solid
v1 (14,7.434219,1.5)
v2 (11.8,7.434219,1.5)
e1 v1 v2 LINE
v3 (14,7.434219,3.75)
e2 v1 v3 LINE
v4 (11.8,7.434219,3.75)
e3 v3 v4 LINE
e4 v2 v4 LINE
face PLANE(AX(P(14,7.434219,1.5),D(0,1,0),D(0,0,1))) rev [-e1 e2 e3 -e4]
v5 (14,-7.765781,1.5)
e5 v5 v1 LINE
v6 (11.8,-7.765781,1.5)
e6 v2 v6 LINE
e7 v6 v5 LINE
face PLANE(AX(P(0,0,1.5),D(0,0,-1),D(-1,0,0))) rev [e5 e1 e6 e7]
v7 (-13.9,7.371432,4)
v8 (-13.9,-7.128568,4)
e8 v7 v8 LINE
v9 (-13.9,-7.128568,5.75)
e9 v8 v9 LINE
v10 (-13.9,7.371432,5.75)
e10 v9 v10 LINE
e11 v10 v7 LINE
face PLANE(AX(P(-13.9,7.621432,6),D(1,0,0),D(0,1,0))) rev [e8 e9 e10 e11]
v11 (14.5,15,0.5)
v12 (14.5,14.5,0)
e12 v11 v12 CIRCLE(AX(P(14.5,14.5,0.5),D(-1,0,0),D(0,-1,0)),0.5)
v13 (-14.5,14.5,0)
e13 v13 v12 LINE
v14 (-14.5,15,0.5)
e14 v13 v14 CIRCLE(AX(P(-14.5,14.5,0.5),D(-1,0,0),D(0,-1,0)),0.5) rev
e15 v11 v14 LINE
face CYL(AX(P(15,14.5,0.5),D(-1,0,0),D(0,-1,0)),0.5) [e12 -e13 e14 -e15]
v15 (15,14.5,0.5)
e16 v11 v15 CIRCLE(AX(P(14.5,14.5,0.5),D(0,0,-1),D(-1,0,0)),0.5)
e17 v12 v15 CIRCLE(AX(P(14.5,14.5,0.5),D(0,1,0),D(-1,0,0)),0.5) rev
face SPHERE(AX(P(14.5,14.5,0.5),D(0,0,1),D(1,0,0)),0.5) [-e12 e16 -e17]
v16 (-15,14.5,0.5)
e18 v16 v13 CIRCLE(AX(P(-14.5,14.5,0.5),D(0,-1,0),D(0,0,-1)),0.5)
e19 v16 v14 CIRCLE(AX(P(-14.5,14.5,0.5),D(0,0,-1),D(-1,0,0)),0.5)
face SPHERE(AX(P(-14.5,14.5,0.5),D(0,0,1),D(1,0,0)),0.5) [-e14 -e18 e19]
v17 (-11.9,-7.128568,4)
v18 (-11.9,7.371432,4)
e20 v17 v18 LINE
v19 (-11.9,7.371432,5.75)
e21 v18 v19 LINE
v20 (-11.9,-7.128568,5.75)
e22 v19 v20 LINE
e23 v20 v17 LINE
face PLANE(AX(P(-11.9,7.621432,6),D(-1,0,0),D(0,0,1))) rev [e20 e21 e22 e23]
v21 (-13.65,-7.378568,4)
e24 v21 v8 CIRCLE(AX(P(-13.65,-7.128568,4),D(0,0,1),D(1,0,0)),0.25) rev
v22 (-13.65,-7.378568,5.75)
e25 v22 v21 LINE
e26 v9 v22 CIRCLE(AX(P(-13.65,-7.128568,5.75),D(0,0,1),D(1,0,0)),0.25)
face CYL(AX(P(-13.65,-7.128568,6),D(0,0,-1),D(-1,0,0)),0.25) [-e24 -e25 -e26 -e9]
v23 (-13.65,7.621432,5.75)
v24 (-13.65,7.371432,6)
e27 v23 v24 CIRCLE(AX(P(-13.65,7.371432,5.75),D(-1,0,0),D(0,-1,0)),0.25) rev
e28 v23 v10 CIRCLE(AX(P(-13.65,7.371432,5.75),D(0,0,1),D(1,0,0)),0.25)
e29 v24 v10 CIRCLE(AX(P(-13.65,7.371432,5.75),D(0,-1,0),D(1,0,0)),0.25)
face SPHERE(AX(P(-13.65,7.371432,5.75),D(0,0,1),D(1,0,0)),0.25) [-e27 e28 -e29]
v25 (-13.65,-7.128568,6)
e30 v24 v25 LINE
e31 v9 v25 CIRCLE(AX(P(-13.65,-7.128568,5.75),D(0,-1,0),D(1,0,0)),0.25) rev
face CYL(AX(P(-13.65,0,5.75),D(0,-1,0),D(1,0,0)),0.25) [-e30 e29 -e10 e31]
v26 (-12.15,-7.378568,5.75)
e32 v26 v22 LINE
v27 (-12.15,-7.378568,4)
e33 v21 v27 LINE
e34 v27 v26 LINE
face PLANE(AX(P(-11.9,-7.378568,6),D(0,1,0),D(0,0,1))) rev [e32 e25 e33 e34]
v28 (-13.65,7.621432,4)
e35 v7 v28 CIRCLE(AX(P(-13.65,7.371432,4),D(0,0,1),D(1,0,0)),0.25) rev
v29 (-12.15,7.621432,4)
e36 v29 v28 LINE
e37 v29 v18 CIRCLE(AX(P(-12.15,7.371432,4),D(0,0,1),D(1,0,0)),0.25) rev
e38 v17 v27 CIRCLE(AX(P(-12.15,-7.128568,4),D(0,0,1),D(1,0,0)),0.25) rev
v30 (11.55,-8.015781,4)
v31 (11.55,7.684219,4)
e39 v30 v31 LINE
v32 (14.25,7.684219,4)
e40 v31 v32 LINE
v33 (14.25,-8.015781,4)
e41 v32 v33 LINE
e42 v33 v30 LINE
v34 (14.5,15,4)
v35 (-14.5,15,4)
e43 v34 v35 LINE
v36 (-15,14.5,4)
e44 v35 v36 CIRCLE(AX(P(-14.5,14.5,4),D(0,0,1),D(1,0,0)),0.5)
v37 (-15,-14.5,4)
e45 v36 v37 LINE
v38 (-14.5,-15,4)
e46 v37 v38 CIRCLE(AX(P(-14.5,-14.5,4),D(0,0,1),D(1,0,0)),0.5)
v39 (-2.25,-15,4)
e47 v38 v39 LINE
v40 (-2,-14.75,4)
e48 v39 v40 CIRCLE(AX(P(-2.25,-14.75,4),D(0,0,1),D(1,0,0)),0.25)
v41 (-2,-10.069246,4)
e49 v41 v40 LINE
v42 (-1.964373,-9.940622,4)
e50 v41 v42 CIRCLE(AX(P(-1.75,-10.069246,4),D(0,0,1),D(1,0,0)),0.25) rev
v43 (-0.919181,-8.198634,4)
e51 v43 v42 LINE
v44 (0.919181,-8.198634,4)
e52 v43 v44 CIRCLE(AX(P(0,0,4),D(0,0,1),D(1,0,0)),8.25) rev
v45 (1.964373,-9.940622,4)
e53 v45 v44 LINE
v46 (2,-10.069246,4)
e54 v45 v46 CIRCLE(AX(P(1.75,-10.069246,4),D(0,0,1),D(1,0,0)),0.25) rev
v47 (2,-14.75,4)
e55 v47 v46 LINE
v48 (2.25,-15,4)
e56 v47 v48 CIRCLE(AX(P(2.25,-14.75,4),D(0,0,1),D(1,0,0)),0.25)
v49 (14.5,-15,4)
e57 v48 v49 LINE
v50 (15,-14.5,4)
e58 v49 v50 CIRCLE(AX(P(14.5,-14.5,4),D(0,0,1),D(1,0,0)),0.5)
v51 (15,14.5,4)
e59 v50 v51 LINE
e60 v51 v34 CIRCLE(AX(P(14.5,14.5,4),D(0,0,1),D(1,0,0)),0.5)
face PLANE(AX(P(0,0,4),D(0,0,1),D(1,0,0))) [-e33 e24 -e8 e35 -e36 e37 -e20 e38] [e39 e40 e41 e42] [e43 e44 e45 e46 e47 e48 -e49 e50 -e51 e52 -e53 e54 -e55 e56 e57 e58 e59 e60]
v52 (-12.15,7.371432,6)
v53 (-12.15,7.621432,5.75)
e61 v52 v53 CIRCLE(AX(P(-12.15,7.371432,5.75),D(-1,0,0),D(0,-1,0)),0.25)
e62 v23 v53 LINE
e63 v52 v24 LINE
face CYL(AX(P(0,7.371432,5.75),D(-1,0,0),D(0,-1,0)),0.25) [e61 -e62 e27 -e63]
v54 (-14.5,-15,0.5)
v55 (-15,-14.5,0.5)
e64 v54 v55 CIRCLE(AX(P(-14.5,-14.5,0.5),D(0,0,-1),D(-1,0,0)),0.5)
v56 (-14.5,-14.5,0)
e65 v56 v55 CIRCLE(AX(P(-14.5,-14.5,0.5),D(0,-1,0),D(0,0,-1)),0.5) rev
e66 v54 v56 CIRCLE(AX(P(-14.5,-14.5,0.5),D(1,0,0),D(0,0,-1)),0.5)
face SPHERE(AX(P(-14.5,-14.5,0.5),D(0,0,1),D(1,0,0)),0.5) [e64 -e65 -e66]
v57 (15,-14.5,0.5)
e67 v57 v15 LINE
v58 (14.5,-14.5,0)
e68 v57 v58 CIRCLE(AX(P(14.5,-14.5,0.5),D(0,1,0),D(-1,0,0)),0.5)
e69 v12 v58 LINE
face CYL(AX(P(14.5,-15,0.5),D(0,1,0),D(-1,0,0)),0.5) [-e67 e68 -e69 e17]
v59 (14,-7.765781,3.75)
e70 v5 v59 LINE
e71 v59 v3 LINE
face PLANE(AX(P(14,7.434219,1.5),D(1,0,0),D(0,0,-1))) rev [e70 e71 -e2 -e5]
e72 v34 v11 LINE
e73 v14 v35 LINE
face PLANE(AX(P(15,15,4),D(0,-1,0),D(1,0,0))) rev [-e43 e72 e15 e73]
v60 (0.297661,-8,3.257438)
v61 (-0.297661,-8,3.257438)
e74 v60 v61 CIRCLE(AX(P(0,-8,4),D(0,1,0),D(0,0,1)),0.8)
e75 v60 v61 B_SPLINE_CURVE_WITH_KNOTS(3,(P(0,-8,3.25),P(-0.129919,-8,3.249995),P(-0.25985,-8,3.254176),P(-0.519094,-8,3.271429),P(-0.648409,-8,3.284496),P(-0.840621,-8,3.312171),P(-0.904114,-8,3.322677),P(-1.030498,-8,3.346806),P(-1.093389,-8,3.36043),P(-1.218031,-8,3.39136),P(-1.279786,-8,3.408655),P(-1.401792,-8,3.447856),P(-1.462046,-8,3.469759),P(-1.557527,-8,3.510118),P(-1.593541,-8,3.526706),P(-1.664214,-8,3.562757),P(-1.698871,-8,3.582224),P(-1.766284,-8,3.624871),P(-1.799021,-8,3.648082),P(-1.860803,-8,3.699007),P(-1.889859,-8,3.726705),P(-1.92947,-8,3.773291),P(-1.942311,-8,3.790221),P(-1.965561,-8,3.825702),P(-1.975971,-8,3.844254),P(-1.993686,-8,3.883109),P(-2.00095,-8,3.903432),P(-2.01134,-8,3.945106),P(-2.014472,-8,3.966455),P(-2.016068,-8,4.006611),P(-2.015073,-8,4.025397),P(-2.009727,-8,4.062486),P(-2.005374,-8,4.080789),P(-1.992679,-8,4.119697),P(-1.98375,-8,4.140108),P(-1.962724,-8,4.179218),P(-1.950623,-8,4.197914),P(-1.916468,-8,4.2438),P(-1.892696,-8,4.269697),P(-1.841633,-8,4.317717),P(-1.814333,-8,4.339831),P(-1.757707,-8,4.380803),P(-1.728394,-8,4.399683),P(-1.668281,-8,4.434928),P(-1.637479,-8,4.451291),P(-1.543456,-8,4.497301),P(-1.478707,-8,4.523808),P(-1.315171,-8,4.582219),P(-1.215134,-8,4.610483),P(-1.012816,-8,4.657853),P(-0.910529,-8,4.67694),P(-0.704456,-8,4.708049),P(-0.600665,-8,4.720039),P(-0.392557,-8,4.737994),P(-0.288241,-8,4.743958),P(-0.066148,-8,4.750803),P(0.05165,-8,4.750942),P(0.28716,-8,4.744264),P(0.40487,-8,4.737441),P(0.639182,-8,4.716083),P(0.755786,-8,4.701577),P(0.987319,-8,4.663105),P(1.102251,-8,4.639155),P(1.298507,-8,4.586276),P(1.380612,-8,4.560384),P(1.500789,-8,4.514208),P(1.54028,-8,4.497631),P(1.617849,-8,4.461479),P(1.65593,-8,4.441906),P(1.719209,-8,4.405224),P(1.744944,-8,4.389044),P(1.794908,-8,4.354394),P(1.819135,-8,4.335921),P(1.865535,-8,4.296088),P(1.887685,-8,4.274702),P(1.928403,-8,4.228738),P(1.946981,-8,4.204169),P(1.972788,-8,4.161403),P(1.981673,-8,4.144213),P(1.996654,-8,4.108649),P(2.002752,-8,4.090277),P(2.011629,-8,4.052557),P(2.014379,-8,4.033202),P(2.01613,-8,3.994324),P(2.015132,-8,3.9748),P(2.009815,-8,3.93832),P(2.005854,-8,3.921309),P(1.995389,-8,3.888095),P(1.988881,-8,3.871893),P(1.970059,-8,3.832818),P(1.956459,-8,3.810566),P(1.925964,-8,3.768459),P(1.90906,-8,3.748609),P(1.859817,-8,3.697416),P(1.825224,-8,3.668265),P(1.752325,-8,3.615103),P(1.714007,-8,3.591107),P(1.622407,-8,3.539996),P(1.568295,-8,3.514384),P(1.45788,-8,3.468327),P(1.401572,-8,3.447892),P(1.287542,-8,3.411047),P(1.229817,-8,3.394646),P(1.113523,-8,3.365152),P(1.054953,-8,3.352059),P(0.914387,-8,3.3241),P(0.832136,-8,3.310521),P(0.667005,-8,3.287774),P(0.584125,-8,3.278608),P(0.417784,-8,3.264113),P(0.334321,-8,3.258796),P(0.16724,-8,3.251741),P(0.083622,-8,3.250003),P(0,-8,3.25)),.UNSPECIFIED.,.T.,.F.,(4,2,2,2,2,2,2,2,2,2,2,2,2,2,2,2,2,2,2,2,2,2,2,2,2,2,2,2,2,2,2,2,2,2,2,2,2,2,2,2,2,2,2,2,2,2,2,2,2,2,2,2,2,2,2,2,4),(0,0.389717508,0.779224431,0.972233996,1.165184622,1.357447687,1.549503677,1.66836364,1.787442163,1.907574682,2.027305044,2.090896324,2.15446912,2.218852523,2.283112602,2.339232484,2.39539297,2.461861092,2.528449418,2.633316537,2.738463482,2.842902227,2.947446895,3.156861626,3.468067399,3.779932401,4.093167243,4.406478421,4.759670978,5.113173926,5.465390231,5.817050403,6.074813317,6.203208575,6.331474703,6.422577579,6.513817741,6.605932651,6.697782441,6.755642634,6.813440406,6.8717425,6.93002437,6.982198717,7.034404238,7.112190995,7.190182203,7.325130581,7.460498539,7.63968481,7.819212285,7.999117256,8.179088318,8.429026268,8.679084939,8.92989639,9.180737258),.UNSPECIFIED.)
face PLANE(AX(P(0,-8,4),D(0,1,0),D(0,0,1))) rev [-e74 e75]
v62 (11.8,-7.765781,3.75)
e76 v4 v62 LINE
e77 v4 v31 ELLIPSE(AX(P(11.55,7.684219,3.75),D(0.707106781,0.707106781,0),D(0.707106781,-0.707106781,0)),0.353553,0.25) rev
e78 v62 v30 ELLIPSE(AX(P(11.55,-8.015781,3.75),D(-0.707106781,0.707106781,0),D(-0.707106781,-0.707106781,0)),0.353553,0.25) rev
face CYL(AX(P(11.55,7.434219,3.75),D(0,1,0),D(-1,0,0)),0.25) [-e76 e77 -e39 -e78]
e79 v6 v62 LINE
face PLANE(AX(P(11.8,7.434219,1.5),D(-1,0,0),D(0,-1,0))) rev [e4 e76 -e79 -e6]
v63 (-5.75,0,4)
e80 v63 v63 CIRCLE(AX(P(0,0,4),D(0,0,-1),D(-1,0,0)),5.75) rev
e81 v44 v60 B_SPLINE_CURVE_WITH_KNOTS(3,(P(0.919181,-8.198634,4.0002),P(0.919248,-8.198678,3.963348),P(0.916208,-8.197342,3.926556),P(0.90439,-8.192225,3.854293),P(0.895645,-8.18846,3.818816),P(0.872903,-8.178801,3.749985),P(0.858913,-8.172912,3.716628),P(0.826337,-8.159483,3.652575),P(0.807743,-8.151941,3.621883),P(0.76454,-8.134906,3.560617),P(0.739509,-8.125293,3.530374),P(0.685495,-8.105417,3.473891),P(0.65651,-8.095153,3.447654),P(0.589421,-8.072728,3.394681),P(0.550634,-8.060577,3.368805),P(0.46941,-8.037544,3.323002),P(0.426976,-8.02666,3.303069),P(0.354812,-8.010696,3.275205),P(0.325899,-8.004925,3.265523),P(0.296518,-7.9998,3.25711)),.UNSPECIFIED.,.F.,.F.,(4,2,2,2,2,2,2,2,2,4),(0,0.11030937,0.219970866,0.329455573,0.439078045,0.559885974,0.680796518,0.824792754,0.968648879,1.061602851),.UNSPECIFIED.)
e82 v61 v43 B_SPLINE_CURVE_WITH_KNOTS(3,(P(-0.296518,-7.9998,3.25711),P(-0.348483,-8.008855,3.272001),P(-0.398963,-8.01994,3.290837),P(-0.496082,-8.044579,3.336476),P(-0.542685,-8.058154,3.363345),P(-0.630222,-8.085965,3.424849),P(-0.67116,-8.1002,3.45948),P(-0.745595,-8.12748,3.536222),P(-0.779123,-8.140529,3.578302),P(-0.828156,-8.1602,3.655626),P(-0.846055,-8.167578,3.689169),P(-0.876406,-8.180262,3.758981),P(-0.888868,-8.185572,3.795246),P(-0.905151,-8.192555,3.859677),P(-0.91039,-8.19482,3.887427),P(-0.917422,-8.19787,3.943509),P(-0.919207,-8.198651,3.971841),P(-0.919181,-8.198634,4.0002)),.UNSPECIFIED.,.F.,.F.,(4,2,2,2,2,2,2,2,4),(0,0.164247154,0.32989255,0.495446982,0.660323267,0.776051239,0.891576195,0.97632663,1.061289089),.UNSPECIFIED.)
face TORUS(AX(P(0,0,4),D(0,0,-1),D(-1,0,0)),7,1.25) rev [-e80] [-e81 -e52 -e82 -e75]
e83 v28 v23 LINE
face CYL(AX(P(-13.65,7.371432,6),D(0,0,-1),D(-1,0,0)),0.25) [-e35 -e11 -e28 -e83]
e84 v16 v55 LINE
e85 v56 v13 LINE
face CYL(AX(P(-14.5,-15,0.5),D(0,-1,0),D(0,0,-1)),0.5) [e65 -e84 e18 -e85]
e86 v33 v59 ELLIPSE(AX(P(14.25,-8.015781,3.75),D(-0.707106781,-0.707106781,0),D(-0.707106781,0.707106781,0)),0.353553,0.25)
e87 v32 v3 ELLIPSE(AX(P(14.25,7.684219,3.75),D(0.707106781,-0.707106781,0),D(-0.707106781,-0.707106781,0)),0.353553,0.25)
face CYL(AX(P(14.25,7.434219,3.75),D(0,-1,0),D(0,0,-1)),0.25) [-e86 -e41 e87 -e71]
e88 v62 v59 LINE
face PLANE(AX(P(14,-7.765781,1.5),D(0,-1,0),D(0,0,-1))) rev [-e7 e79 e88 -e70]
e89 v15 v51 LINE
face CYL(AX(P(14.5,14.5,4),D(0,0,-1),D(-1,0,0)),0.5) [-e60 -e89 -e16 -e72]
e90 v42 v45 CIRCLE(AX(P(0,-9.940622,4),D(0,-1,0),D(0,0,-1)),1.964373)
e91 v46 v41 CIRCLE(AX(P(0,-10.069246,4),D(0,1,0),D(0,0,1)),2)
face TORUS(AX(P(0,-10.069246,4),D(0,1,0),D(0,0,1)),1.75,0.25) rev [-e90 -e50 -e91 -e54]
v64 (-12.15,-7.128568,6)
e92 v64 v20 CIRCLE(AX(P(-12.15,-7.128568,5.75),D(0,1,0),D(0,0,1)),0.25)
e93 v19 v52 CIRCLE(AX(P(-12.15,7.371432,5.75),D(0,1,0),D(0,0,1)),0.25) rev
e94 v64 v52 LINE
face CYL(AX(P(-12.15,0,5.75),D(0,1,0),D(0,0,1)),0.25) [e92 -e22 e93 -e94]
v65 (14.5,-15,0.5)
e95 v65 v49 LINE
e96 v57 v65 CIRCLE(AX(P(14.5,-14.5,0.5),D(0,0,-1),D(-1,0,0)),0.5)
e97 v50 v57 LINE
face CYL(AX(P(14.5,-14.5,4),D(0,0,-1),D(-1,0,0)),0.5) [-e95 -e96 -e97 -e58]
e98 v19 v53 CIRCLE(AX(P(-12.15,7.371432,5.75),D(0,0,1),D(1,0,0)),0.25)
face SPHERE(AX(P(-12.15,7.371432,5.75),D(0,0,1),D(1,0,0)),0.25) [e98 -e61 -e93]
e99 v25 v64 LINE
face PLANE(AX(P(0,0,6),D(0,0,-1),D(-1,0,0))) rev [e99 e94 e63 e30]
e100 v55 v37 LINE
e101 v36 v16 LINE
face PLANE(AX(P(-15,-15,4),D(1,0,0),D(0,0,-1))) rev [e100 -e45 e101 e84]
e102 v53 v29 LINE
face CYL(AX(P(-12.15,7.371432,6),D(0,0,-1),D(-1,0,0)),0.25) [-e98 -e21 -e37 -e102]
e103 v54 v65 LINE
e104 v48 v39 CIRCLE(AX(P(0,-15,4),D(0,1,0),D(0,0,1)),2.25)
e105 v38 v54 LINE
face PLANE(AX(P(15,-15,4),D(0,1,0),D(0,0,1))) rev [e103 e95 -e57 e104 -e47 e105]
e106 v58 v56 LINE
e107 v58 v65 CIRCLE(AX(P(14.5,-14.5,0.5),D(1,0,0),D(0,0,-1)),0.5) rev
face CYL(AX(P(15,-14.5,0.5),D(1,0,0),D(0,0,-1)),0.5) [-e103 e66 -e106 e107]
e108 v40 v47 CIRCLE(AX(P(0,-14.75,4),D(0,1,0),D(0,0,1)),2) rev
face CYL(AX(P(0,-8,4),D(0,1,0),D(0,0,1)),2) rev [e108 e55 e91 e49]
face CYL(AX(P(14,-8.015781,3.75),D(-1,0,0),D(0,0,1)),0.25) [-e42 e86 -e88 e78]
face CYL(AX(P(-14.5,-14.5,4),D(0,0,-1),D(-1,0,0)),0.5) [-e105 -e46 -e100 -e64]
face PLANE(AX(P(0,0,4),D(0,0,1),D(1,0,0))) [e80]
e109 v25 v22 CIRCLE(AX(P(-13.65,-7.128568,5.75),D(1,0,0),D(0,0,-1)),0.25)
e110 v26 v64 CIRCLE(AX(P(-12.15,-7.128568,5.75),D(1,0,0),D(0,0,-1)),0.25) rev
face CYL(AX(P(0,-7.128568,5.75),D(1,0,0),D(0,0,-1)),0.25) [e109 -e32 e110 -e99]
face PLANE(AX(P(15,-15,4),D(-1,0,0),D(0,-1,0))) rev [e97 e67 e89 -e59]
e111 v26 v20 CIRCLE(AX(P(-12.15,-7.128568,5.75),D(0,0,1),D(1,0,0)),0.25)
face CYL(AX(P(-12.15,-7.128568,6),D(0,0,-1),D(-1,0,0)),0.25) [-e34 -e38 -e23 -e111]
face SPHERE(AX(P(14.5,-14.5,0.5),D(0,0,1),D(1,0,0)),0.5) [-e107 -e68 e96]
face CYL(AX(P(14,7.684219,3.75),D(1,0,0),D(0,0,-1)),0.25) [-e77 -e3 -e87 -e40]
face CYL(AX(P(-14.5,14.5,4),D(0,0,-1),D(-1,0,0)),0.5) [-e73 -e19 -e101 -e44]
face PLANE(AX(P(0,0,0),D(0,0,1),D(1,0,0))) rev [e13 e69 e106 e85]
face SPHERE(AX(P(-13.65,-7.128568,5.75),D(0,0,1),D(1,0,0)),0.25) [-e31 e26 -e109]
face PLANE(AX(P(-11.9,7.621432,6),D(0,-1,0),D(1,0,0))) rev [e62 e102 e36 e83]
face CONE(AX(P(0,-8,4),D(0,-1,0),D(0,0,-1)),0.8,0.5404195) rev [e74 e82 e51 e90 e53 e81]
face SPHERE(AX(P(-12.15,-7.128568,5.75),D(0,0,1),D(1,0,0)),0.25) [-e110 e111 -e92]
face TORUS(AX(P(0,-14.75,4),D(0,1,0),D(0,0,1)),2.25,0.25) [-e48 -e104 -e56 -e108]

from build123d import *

# Parameters (mm, degrees)
SKETCH1_W           = 30
SKETCH1_H           = 30
BOSS_EXTRUDE1_DEPTH = 4
SKETCH4_R           = 1.25
SKETCH7_W           = 2
SKETCH7_H           = 15
BOSS_EXTRUDE2_DEPTH = 2
SKETCH8_W           = 2.2
SKETCH8_H           = 15.2
CUT_EXTRUDE2_DEPTH  = 2.5
FILLET1_R           = 0.25
FILLET2_R           = 0.25
FILLET3_R           = 0.25
FILLET5_R           = 0.5
FILLET6_R           = 0.5
FILLET7_R           = 0.25


with BuildPart() as part:
    # Sketch1 → Boss-Extrude1 (new body)
    with BuildSketch(Plane.XY):
        Rectangle(SKETCH1_W, SKETCH1_H)
    extrude(amount=BOSS_EXTRUDE1_DEPTH)

    # Sketch4 → Cut-Revolve1 (revolve, cut)
    with BuildSketch(Plane(origin=(0, 0, 0), x_dir=(1, 0, 0), z_dir=(0, 1, 0)), mode=Mode.PRIVATE) as cut_revolve1_sk:
        with Locations((7, -4)):
            Circle(SKETCH4_R)
    revolve(cut_revolve1_sk.sketch.rotate(Axis((0, 0, 0), (0, 0, 1)), 180), axis=Axis((0, 0, 0), (0, 0, 1)), mode=Mode.SUBTRACT)

    # Sketch9 → Cut-Revolve2 (revolve, cut)
    with BuildSketch(Plane(origin=(0, 0, 0), x_dir=(0, 0, -1), z_dir=(1, 0, 0))):
        Polygon((-4, -8), (-4.8, -8), (-6, -10), (-6, -15), (-4, -15), align=None)
    revolve(axis=Axis((0, -8, 4), (0, -1, 0)), mode=Mode.SUBTRACT)

    # Sketch7 → Boss-Extrude2 (add)
    with BuildSketch(Plane.XY.offset(4)):
        with Locations((-12.9, 0.121431972)):
            Rectangle(SKETCH7_W, SKETCH7_H)
    extrude(amount=BOSS_EXTRUDE2_DEPTH)

    # Sketch8 → Cut-Extrude2 (cut)
    with BuildSketch(Plane.XY.offset(4)):
        with Locations((12.9, -0.165781366)):
            Rectangle(SKETCH8_W, SKETCH8_H)
    extrude(amount=-CUT_EXTRUDE2_DEPTH, mode=Mode.SUBTRACT)

    # Fillet1
    fillet1_edges = [part.edges().sort_by_distance(p)[0] for p in [
        (-13.9, 0.121431972, 6),
        (-12.9, -7.378568028, 6),
        (-11.9, 0.121431972, 6),
        (-12.9, 7.621431972, 6),
    ]]
    fillet(fillet1_edges, radius=FILLET1_R)

    # Fillet2
    # the kernel refuses this fillet: 0.25 mm, written as the material it takes off along each edge
    with BuildSketch(Plane(origin=(-12.15, -7.128568028, 5.75), x_dir=(0, -1, 0), z_dir=(1, 0, 0))) as fillet2_piece_1_section:
        Polygon((0, 0), (FILLET2_R, 0), (FILLET2_R, -FILLET2_R), (0, -FILLET2_R), align=None)
    fillet2_piece_1 = extrude(amount=FILLET2_R, mode=Mode.PRIVATE)
    fillet2_piece_1 = fillet2_piece_1 - Plane(origin=(-12.15, -7.128568028, 5.75), x_dir=(0, 0.7071067811865475, -0.7071067811865475), z_dir=(1, 0, 0)) * Sphere(FILLET2_R, mode=Mode.PRIVATE)
    add(fillet2_piece_1, mode=Mode.SUBTRACT)
    with BuildSketch(Plane(origin=(-13.65, -7.128568028, 5.75), x_dir=(-1, 0, 0), z_dir=(0, -1, 0))) as fillet2_piece_2_section:
        Polygon((0, 0), (FILLET2_R, 0), (FILLET2_R, -FILLET2_R), (0, -FILLET2_R), align=None)
    fillet2_piece_2 = extrude(amount=FILLET2_R, mode=Mode.PRIVATE)
    fillet2_piece_2 = fillet2_piece_2 - Plane(origin=(-13.65, -7.128568028, 5.75), x_dir=(0.7071067811865475, 0, -0.7071067811865475), z_dir=(0, -1, 0)) * Sphere(FILLET2_R, mode=Mode.PRIVATE)
    add(fillet2_piece_2, mode=Mode.SUBTRACT)
    with BuildSketch(Plane(origin=(-12.15, 7.371431972, 5.75), x_dir=(0, 1, 0), z_dir=(1, 0, 0))) as fillet2_piece_3_section:
        Polygon((0, 0), (FILLET2_R, 0), (FILLET2_R, FILLET2_R), (0, FILLET2_R), align=None)
    fillet2_piece_3 = extrude(amount=FILLET2_R, mode=Mode.PRIVATE)
    fillet2_piece_3 = fillet2_piece_3 - Plane(origin=(-12.15, 7.371431972, 5.75), x_dir=(0, -0.7071067811865475, -0.7071067811865475), z_dir=(1, 0, 0)) * Sphere(FILLET2_R, mode=Mode.PRIVATE)
    add(fillet2_piece_3, mode=Mode.SUBTRACT)
    with BuildSketch(Plane(origin=(-13.65, 7.371431972, 5.75), x_dir=(-1, 0, 0), z_dir=(0, 1, 0))) as fillet2_piece_4_section:
        Polygon((0, 0), (FILLET2_R, 0), (FILLET2_R, FILLET2_R), (0, FILLET2_R), align=None)
    fillet2_piece_4 = extrude(amount=FILLET2_R, mode=Mode.PRIVATE)
    fillet2_piece_4 = fillet2_piece_4 - Plane(origin=(-13.65, 7.371431972, 5.75), x_dir=(0.7071067811865475, 0, -0.7071067811865475), z_dir=(0, 1, 0)) * Sphere(FILLET2_R, mode=Mode.PRIVATE)
    add(fillet2_piece_4, mode=Mode.SUBTRACT)
    with BuildSketch(Plane(origin=(-13.9, 7.621431972, 4), x_dir=(1, 0, 0), z_dir=(0, 0, 1)), Plane(origin=(-11.9, 7.621431972, 4), x_dir=(0, -1, 0), z_dir=(0, 0, 1))) as fillet2_piece_5:
        with BuildLine():
            CenterArc((FILLET2_R, -FILLET2_R), FILLET2_R, 90, 90)
            Line((0, -FILLET2_R), (0, 0))
            Line((0, 0), (FILLET2_R, 0))
        make_face()
    extrude(amount=1.75, mode=Mode.SUBTRACT)
    with BuildSketch(Plane(origin=(-11.9, -7.378568028, 4), x_dir=(0, 1, 0), z_dir=(0, 0, 1)), Plane(origin=(-13.9, -7.378568028, 4), x_dir=(1, 0, 0), z_dir=(0, 0, 1))) as fillet2_piece_6:
        with BuildLine():
            CenterArc((FILLET2_R, FILLET2_R), FILLET2_R, 180, 90)
            Line((0, FILLET2_R), (0, 0))
            Line((0, 0), (FILLET2_R, 0))
        make_face()
    extrude(amount=1.75, mode=Mode.SUBTRACT)

    # Fillet3
    fillet3_edges = [part.edges().sort_by_distance(p)[0] for p in [
        (11.8, -0.165781366, 4),
        (12.9, -7.765781366, 4),
        (14, -0.165781366, 4),
        (12.9, 7.434218634, 4),
    ]]
    fillet(fillet3_edges, radius=FILLET3_R)

    # Fillet5
    fillet5_edges = [part.edges().sort_by_distance(p)[0] for p in [
        (0, 15, 0),
        (15, 0, 0),
        (0, -15, 0),
        (-15, 0, 0),
    ]]
    fillet(fillet5_edges, radius=FILLET5_R)

    # Fillet6
    # the kernel refuses this fillet: 0.5 mm, written as the material it takes off along each edge
    with BuildSketch(Plane(origin=(-14.5, 14.5, 0.5), x_dir=(-1, 0, 0), z_dir=(0, 1, 0))) as fillet6_piece_1_section:
        Polygon((0, 0), (FILLET6_R, 0), (FILLET6_R, -FILLET6_R), (0, -FILLET6_R), align=None)
    fillet6_piece_1 = extrude(amount=FILLET6_R, mode=Mode.PRIVATE)
    fillet6_piece_1 = fillet6_piece_1 - Plane(origin=(-14.5, 14.5, 0.5), x_dir=(0.7071067811865475, 0, 0.7071067811865475), z_dir=(0, 1, 0)) * Sphere(FILLET6_R, mode=Mode.PRIVATE)
    add(fillet6_piece_1, mode=Mode.SUBTRACT)
    with BuildSketch(Plane(origin=(14.5, 14.5, 0.5), x_dir=(0, 1, 0), z_dir=(1, 0, 0))) as fillet6_piece_2_section:
        Polygon((0, 0), (FILLET6_R, 0), (FILLET6_R, -FILLET6_R), (0, -FILLET6_R), align=None)
    fillet6_piece_2 = extrude(amount=FILLET6_R, mode=Mode.PRIVATE)
    fillet6_piece_2 = fillet6_piece_2 - Plane(origin=(14.5, 14.5, 0.5), x_dir=(0, -0.7071067811865475, 0.7071067811865475), z_dir=(1, 0, 0)) * Sphere(FILLET6_R, mode=Mode.PRIVATE)
    add(fillet6_piece_2, mode=Mode.SUBTRACT)
    with BuildSketch(Plane(origin=(-14.5, -14.5, 0.5), x_dir=(-1, 0, 0), z_dir=(0, -1, 0))) as fillet6_piece_3_section:
        Polygon((0, 0), (FILLET6_R, 0), (FILLET6_R, FILLET6_R), (0, FILLET6_R), align=None)
    fillet6_piece_3 = extrude(amount=FILLET6_R, mode=Mode.PRIVATE)
    fillet6_piece_3 = fillet6_piece_3 - Plane(origin=(-14.5, -14.5, 0.5), x_dir=(0.7071067811865475, 0, 0.7071067811865475), z_dir=(0, -1, 0)) * Sphere(FILLET6_R, mode=Mode.PRIVATE)
    add(fillet6_piece_3, mode=Mode.SUBTRACT)
    with BuildSketch(Plane(origin=(14.5, -14.5, 0.5), x_dir=(0, -1, 0), z_dir=(1, 0, 0))) as fillet6_piece_4_section:
        Polygon((0, 0), (FILLET6_R, 0), (FILLET6_R, FILLET6_R), (0, FILLET6_R), align=None)
    fillet6_piece_4 = extrude(amount=FILLET6_R, mode=Mode.PRIVATE)
    fillet6_piece_4 = fillet6_piece_4 - Plane(origin=(14.5, -14.5, 0.5), x_dir=(0, 0.7071067811865475, 0.7071067811865475), z_dir=(1, 0, 0)) * Sphere(FILLET6_R, mode=Mode.PRIVATE)
    add(fillet6_piece_4, mode=Mode.SUBTRACT)
    with BuildSketch(Plane(origin=(-15, 15, 0.5), x_dir=(1, 0, 0), z_dir=(0, 0, 1)), Plane(origin=(15, 15, 0.5), x_dir=(0, -1, 0), z_dir=(0, 0, 1))) as fillet6_piece_5:
        with BuildLine():
            CenterArc((FILLET6_R, -FILLET6_R), FILLET6_R, 90, 90)
            Line((0, -FILLET6_R), (0, 0))
            Line((0, 0), (FILLET6_R, 0))
        make_face()
    extrude(amount=4.75, mode=Mode.SUBTRACT)
    with BuildSketch(Plane(origin=(15, -15, 0.5), x_dir=(0, 1, 0), z_dir=(0, 0, 1)), Plane(origin=(-15, -15, 0.5), x_dir=(1, 0, 0), z_dir=(0, 0, 1))) as fillet6_piece_6:
        with BuildLine():
            CenterArc((FILLET6_R, FILLET6_R), FILLET6_R, 180, 90)
            Line((0, FILLET6_R), (0, 0))
            Line((0, 0), (FILLET6_R, 0))
        make_face()
    extrude(amount=4.75, mode=Mode.SUBTRACT)

    # Fillet7
    fillet7_edges = [part.edges().sort_by_distance(p)[0] for p in [
        (0, -10, 2),
        (0, -15, 2),
    ]]
    fillet(fillet7_edges, radius=FILLET7_R)


solid = part.part
